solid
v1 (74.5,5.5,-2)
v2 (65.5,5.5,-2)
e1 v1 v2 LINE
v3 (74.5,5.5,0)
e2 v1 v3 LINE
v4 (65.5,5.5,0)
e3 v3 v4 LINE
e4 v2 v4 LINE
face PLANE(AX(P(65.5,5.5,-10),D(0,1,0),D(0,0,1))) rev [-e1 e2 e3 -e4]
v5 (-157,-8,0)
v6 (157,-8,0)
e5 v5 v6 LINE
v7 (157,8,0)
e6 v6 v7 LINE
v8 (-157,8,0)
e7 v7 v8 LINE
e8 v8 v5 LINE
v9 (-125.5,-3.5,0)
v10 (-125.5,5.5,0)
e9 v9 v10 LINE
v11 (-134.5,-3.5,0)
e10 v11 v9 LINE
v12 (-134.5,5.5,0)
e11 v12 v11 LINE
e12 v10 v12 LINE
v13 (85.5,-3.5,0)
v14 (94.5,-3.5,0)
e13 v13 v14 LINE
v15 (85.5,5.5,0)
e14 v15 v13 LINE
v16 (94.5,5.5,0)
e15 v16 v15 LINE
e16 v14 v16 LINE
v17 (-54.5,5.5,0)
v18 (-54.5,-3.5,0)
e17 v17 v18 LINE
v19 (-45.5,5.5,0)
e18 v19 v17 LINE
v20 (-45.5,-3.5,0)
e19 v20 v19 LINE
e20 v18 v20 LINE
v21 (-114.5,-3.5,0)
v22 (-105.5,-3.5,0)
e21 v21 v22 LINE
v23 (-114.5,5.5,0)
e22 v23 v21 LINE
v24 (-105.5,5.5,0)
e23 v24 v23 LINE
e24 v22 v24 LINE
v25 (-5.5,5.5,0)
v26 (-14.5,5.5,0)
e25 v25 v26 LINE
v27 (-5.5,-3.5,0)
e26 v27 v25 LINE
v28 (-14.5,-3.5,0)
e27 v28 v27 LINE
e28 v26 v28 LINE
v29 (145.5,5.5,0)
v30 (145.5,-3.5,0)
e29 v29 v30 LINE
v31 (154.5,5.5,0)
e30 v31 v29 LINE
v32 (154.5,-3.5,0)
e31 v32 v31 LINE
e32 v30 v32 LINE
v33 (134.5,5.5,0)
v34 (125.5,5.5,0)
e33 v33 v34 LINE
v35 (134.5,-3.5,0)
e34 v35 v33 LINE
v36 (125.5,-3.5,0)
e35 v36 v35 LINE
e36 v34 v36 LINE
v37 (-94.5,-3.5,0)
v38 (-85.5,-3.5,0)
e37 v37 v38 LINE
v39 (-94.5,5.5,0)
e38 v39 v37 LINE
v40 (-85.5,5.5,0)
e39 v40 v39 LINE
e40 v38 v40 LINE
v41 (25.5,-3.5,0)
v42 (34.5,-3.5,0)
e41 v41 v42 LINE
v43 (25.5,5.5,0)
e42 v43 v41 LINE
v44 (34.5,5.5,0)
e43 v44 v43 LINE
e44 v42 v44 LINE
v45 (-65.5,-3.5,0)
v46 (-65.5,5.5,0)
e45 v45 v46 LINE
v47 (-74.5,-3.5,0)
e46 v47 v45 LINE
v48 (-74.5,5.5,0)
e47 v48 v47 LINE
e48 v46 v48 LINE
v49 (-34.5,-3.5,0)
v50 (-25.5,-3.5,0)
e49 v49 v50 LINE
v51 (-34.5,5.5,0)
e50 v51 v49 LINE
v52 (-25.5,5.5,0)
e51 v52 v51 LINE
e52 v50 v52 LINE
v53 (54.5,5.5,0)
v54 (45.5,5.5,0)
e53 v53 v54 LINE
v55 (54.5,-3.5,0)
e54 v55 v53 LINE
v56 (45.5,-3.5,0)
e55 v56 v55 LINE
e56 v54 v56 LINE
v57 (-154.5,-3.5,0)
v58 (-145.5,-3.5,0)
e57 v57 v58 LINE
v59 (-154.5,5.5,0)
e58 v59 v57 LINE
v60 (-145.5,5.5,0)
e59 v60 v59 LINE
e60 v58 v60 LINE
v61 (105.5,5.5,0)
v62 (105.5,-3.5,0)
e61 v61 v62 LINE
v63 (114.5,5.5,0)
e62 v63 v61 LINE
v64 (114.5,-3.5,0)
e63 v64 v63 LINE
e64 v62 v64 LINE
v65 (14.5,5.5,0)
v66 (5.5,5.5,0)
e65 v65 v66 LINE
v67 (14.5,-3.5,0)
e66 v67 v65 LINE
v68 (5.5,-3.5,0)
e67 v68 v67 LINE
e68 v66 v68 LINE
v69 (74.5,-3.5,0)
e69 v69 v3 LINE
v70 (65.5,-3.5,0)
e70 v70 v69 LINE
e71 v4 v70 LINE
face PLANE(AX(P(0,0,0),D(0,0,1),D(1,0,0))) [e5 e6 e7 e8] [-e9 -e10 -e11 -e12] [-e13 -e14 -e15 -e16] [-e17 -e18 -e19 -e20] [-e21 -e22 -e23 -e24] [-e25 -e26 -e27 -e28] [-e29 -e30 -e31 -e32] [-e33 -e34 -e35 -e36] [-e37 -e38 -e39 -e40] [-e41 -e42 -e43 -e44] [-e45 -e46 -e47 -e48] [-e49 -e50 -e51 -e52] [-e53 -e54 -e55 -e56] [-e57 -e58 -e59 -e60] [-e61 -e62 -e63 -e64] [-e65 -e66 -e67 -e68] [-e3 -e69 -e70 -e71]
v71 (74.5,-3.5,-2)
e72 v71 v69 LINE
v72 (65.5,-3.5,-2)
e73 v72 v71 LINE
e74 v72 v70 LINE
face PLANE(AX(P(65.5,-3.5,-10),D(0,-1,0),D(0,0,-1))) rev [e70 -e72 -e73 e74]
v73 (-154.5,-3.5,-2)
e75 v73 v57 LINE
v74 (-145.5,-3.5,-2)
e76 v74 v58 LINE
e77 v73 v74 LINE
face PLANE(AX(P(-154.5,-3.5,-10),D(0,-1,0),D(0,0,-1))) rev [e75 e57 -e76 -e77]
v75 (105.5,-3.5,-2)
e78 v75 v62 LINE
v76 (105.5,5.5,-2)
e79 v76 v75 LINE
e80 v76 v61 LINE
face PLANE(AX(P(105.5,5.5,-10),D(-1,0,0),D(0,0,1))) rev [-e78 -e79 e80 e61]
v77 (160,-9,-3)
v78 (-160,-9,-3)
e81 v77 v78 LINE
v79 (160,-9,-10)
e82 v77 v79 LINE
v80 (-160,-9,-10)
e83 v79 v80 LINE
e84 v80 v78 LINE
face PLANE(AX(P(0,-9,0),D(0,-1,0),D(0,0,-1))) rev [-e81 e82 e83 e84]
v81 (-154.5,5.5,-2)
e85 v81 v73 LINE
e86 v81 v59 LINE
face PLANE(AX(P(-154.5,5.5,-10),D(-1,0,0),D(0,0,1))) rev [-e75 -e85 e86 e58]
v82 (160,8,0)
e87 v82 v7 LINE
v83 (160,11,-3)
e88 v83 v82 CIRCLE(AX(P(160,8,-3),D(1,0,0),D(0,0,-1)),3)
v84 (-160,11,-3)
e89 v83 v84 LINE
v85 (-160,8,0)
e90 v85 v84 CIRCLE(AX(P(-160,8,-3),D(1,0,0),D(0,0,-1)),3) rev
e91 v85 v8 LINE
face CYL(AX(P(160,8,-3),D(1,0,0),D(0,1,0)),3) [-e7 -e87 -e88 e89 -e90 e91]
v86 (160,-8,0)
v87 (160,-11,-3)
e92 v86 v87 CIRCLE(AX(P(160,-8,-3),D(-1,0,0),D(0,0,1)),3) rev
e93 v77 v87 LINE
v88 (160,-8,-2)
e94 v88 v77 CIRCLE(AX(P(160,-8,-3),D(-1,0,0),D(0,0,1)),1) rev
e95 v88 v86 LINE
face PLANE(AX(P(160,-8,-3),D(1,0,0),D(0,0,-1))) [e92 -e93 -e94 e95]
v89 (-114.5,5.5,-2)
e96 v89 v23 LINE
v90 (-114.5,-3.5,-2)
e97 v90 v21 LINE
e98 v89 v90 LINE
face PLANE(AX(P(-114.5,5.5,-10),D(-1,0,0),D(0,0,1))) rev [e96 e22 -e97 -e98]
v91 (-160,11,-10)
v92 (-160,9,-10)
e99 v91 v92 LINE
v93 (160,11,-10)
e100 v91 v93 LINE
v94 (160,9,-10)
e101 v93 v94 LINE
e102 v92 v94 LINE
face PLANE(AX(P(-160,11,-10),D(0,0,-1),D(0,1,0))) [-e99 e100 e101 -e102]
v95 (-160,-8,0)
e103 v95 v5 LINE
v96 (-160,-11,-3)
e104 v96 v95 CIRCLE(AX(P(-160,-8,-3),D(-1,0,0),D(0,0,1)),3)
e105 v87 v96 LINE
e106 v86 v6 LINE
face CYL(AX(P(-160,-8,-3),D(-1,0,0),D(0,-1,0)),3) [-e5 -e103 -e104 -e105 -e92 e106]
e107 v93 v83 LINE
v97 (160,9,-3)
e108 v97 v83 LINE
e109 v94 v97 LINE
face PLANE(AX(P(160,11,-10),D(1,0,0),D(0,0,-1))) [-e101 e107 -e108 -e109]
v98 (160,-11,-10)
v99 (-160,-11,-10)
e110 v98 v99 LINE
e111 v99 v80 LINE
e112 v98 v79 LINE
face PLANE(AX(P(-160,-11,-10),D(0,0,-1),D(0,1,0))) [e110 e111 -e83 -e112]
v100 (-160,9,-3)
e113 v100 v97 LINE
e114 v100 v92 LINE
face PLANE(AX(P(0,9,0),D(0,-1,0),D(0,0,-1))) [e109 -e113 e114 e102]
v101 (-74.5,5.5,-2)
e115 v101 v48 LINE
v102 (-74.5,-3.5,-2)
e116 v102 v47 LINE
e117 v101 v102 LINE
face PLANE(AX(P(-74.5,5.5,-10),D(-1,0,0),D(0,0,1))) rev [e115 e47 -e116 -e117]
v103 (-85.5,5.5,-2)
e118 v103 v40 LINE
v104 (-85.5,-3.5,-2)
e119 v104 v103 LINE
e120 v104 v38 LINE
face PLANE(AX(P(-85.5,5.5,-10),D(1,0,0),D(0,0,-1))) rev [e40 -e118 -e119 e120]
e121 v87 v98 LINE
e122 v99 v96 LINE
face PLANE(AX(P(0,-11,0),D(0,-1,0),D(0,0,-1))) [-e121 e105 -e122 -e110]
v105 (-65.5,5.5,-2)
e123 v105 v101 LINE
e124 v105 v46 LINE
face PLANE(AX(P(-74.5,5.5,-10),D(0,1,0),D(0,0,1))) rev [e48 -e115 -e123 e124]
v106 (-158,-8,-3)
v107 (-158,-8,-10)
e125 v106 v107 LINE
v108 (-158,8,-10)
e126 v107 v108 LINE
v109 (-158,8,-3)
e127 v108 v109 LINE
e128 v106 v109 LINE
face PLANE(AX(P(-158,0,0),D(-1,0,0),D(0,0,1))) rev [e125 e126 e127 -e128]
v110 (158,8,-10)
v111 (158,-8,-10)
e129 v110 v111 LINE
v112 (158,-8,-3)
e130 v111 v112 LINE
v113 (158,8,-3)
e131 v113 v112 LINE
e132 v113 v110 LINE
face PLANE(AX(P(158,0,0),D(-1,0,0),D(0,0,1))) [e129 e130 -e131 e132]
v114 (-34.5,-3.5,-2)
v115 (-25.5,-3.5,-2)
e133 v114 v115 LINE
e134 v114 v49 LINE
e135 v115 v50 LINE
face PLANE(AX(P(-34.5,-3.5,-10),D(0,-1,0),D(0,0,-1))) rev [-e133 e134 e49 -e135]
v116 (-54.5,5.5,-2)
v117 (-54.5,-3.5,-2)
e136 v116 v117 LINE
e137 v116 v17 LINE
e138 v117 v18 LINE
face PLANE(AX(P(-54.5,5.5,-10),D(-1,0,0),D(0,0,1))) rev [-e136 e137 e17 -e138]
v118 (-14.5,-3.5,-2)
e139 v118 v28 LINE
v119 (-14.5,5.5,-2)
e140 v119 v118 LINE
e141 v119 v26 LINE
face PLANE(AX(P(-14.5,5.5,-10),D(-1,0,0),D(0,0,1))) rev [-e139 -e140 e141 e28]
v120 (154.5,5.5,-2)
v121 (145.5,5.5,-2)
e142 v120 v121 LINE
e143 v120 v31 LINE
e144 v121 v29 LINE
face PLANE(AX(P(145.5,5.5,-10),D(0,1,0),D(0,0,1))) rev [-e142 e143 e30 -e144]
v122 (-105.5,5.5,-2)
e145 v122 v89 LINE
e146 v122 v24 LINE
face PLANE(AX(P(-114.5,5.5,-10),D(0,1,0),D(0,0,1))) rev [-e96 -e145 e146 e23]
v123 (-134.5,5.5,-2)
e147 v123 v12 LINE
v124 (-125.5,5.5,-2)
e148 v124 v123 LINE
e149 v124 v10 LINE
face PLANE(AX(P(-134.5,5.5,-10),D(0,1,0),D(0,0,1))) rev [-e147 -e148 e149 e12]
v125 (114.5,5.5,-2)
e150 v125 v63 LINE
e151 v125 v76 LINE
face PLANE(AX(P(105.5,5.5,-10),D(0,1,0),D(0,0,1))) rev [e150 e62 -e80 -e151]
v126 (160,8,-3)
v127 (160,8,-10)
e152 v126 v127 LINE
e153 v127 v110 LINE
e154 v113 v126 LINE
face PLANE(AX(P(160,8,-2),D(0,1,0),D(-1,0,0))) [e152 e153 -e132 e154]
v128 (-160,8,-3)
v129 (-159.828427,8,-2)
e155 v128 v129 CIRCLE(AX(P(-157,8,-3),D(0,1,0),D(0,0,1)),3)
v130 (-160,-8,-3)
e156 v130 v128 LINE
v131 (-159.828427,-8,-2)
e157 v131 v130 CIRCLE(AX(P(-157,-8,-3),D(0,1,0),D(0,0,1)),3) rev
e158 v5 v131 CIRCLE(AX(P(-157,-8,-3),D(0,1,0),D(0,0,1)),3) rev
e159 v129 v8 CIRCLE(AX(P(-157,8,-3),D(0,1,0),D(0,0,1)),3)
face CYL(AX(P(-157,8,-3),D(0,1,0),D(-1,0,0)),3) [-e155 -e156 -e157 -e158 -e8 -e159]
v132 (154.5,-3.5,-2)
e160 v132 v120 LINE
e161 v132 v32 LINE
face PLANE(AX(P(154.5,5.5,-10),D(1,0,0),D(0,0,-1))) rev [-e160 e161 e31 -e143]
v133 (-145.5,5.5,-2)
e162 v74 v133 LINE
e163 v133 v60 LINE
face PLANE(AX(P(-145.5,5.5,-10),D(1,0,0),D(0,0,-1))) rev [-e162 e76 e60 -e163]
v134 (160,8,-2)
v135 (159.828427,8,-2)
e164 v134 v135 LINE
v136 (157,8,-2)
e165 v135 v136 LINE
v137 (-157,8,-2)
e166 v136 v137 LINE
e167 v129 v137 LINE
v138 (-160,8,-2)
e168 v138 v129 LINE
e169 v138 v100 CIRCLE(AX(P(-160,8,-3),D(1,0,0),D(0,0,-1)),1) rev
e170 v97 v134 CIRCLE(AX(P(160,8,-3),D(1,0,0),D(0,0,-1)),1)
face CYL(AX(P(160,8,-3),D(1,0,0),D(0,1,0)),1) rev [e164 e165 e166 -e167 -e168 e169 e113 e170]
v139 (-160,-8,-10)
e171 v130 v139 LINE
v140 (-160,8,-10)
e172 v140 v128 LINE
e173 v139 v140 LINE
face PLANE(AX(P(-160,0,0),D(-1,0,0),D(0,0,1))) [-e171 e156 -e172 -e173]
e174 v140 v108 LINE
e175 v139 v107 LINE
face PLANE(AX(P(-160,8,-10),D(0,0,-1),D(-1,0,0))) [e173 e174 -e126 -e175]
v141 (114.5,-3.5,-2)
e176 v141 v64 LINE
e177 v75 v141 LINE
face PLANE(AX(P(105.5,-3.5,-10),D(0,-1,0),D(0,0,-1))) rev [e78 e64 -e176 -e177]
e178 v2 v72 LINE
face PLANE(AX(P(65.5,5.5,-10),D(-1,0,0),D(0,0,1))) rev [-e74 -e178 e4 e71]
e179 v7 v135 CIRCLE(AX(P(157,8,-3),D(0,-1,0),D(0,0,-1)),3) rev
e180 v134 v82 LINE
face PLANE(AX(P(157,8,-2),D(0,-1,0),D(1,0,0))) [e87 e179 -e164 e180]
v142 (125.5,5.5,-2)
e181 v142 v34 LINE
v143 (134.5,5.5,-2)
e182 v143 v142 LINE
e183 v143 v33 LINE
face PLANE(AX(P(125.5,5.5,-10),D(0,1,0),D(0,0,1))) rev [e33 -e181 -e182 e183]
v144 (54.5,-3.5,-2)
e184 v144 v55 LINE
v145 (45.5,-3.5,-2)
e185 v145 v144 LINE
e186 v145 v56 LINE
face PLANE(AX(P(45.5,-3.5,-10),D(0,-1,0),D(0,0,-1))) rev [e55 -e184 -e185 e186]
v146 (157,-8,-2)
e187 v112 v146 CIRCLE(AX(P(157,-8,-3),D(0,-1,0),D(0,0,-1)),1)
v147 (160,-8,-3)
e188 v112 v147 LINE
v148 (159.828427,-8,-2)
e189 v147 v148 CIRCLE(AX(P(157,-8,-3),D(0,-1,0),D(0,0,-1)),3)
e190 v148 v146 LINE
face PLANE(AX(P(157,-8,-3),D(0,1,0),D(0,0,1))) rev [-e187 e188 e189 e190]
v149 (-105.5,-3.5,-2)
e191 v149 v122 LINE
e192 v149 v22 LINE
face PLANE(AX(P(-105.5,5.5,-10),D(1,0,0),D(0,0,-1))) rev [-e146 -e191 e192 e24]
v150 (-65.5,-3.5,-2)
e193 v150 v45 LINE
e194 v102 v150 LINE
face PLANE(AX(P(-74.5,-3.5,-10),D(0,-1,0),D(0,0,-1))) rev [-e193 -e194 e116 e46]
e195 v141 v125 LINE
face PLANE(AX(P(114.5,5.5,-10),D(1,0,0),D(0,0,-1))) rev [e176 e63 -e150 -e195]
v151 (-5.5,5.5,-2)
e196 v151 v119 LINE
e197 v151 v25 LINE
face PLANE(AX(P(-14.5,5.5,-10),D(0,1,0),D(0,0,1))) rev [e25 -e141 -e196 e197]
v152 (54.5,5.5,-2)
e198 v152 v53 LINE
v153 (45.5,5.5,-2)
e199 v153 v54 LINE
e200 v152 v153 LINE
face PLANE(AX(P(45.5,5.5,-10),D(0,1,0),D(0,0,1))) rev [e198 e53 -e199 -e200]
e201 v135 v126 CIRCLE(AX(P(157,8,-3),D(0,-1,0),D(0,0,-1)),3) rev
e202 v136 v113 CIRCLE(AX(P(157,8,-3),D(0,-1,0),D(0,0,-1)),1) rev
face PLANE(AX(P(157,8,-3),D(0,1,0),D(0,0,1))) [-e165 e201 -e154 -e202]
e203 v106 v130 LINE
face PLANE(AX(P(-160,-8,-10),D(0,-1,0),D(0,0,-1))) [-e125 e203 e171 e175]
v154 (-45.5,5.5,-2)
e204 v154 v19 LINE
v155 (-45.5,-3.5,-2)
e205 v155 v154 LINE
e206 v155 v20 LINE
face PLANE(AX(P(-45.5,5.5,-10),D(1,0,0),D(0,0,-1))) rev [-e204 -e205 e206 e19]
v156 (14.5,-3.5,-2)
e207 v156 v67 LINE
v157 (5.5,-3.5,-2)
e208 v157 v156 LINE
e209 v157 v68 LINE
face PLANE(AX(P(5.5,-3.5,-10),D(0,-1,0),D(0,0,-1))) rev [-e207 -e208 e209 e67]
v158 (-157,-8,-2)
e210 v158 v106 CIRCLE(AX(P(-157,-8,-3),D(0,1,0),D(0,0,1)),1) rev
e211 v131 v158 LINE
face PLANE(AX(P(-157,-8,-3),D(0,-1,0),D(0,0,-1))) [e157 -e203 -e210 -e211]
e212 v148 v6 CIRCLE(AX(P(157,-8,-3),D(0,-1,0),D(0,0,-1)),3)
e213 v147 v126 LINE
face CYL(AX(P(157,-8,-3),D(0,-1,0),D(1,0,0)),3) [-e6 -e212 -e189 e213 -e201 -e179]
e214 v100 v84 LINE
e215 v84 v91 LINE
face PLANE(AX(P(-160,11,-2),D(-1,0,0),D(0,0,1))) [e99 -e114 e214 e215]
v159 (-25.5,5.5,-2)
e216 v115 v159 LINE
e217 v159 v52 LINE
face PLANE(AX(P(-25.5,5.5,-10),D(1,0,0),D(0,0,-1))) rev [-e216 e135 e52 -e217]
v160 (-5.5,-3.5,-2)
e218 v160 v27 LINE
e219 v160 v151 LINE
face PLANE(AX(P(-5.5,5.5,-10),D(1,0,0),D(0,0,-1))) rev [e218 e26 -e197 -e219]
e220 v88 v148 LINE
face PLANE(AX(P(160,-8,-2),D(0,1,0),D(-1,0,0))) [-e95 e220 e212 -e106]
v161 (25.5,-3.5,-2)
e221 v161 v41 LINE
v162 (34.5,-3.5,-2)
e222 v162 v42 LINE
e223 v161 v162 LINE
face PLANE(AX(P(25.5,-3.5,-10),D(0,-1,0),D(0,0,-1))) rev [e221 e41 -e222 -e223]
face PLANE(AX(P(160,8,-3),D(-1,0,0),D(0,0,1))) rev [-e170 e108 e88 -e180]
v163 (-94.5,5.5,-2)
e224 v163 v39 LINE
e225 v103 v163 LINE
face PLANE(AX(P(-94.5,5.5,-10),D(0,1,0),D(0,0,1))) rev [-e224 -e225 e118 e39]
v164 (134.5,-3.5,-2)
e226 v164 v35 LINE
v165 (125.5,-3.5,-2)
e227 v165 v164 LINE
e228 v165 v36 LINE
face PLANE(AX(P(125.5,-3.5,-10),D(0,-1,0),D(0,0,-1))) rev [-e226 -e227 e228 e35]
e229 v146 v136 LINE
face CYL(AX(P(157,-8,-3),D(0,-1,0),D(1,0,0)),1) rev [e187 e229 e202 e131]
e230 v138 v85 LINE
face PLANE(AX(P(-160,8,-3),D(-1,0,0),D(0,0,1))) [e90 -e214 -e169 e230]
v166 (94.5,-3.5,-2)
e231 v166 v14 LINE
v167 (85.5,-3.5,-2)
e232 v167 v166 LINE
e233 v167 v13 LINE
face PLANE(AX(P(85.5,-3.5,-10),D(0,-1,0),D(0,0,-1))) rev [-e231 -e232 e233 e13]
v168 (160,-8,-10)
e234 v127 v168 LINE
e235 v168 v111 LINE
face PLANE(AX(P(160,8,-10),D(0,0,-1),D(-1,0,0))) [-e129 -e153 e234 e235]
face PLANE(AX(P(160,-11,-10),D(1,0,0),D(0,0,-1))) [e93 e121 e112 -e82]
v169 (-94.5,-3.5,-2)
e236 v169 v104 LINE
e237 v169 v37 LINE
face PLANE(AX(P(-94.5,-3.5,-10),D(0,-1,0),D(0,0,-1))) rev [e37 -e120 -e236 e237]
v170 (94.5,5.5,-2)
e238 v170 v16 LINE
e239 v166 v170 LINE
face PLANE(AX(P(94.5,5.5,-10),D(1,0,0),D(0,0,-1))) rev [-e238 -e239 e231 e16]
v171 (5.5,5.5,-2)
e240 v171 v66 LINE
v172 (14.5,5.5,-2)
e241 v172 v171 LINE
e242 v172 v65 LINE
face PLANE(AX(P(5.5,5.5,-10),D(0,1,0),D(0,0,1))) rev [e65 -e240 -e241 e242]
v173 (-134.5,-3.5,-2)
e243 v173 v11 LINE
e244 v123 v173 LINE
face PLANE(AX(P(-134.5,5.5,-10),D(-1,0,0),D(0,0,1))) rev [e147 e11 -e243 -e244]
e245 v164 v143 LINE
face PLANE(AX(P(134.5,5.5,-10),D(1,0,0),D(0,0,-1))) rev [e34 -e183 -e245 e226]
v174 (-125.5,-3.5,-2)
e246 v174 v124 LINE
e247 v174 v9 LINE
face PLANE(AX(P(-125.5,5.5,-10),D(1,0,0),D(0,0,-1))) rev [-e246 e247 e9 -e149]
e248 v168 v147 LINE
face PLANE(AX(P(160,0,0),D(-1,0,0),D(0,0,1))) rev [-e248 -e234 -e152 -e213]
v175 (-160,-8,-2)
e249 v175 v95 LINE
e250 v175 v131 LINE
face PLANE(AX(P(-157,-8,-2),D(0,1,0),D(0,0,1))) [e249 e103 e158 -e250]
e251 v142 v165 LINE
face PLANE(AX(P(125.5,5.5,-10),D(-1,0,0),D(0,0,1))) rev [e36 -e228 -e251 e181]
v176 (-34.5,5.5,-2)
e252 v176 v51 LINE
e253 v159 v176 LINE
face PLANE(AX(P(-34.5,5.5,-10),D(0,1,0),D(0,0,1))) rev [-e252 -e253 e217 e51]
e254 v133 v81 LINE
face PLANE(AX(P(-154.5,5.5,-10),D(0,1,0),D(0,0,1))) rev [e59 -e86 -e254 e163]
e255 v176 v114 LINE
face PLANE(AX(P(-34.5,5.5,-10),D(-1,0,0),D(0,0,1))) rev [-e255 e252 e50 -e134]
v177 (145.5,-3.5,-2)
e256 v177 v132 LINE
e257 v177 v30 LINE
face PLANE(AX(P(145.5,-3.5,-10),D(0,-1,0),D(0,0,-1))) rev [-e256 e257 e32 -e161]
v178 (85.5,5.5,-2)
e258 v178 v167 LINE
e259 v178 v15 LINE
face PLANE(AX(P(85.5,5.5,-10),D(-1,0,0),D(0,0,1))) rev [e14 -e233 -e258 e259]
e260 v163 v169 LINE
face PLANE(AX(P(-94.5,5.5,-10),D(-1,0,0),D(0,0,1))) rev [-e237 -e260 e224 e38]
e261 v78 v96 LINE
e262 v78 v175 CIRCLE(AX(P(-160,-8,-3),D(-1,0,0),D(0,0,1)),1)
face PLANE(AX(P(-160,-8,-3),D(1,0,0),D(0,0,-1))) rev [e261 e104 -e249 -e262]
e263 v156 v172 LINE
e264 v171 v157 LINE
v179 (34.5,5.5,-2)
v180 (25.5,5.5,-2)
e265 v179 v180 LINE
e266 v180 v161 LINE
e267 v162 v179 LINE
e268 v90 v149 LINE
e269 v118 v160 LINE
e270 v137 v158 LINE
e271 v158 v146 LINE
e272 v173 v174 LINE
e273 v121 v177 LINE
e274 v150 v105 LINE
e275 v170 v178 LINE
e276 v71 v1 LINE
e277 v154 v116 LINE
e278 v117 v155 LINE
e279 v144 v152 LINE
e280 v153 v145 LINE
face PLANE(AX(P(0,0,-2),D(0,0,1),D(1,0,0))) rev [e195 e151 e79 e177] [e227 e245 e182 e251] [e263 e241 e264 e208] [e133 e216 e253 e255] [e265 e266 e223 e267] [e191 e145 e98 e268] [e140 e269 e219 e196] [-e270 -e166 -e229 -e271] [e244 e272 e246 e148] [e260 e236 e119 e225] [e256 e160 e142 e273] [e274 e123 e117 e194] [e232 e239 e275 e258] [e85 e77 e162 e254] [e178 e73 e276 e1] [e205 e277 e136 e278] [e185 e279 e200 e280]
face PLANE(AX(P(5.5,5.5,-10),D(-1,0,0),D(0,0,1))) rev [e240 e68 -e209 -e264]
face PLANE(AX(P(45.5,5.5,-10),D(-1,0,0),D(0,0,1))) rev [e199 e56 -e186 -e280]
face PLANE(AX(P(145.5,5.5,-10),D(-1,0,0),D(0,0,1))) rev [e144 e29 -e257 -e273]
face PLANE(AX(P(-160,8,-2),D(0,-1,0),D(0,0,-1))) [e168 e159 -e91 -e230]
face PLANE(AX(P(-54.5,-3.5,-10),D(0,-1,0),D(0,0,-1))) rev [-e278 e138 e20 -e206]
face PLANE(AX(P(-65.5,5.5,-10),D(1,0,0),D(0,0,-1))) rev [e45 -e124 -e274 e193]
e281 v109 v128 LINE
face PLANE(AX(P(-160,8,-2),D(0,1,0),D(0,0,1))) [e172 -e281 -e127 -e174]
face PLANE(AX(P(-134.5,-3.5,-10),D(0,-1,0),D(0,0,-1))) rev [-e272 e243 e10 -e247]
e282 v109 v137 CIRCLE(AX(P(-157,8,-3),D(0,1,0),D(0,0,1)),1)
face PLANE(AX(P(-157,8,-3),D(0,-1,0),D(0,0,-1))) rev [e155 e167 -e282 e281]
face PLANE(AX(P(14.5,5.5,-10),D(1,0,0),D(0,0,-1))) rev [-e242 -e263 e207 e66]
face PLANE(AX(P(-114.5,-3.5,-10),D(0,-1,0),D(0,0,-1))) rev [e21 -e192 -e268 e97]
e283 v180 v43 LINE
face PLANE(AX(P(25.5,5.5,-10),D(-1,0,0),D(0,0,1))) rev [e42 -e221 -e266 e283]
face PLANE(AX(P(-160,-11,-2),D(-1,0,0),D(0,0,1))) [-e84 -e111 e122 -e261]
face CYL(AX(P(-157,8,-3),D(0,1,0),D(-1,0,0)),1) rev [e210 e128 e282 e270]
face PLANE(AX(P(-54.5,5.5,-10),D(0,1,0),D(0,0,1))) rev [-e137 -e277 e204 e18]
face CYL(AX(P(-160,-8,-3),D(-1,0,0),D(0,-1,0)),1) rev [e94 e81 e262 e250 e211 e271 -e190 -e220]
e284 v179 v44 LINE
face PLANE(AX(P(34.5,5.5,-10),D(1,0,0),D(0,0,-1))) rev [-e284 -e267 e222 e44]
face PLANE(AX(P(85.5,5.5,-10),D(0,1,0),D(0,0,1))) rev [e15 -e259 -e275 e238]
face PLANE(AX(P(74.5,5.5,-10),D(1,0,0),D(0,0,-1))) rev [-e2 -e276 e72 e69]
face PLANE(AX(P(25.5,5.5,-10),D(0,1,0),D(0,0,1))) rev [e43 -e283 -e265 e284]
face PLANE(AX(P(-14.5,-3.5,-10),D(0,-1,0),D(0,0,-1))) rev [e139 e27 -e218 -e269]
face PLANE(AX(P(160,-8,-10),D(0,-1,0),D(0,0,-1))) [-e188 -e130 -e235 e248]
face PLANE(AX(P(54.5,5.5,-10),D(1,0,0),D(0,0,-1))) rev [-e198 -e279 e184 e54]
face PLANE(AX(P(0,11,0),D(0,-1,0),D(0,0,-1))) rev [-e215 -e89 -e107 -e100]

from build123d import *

# Parameters (mm, degrees)
SKETCH_1_W                         = 320
SKETCH_1_H                         = 22
SM_BASE_FLANGE_1_DEPTH             = 2
SM_EDGE_FLANGE_1_STRIP_W           = 10
SM_EDGE_FLANGE_1_STRIP_H           = 2
SM_EDGE_FLANGE_1_STRIP_CUT_DEPTH   = 320
SM_EDGE_FLANGE_1_STRIP_2_W         = 10
SM_EDGE_FLANGE_1_STRIP_2_H         = 2
SM_EDGE_FLANGE_1_STRIP_CUT_2_DEPTH = 320
SM_EDGE_FLANGE_1_DEPTH             = 320
SM_EDGE_FLANGE_1_BEND_DEPTH        = 320
SM_EDGE_FLANGE_2_STRIP_W           = 10
SM_EDGE_FLANGE_2_STRIP_H           = 2
SM_EDGE_FLANGE_2_STRIP_CUT_DEPTH   = 16
SM_EDGE_FLANGE_2_STRIP_2_W         = 10
SM_EDGE_FLANGE_2_STRIP_2_H         = 2
SM_EDGE_FLANGE_2_STRIP_CUT_2_DEPTH = 16
SM_EDGE_FLANGE_2_DEPTH             = 16
SM_EDGE_FLANGE_2_BEND_DEPTH        = 16
SKETCH_18_W                        = 9
SKETCH_18_H                        = 9
CUT_EXTRUDE_1_DEPTH                = 10
PATTERN_LINEAR_1_COUNT             = 20
PATTERN_LINEAR_1_PITCH             = 20


# Sheet-metal steps are written as plain solids
with BuildPart() as part:
    # Sketch 1 → 基体-法兰1 (new body)
    with BuildSketch(Plane.XY):
        Rectangle(SKETCH_1_W, SKETCH_1_H)
    extrude(amount=-SM_BASE_FLANGE_1_DEPTH)

    # 边线-法兰1 strip (across the edge) → 边线-法兰1 strip cut (cut)
    with BuildSketch(Plane(origin=(160, -11, -2), x_dir=(0, 1, 0), z_dir=(-1, 0, 0))):
        with Locations((-2, -1)):
            Rectangle(SM_EDGE_FLANGE_1_STRIP_W, SM_EDGE_FLANGE_1_STRIP_H)
    extrude(amount=SM_EDGE_FLANGE_1_STRIP_CUT_DEPTH, mode=Mode.SUBTRACT)

    # 边线-法兰1 strip 2 (across the edge) → 边线-法兰1 strip cut 2 (cut)
    with BuildSketch(Plane(origin=(-160, 11, -2), x_dir=(0, -1, 0), z_dir=(1, 0, 0))):
        with Locations((-2, -1)):
            Rectangle(SM_EDGE_FLANGE_1_STRIP_2_W, SM_EDGE_FLANGE_1_STRIP_2_H)
    extrude(amount=SM_EDGE_FLANGE_1_STRIP_CUT_2_DEPTH, mode=Mode.SUBTRACT)

    # 边线-法兰1 section (across the edge) → 边线-法兰1 (add)
    with BuildSketch(Plane(origin=(160, -11, -2), x_dir=(0, 1, 0), z_dir=(-1, 0, 0))):
        with BuildLine():
            Line((0, 1), (0, 8))
            Line((0, 8), (2, 8))
            Line((2, 8), (2, 1))
            ThreePointArc((2, 1), (2.292893219, 0.292893219), (3, 0))
            Line((3, 0), (3, -2))
            ThreePointArc((3, -2), (0.878679656, -1.121320344), (0, 1))
        make_face()
    extrude(amount=SM_EDGE_FLANGE_1_DEPTH)

    # 边线-法兰1 section 2 (across the edge) → 边线-法兰1 bend (add)
    with BuildSketch(Plane(origin=(-160, 11, -2), x_dir=(0, -1, 0), z_dir=(1, 0, 0))):
        with BuildLine():
            Line((0, 1), (0, 8))
            Line((0, 8), (2, 8))
            Line((2, 8), (2, 1))
            ThreePointArc((2, 1), (2.292893219, 0.292893219), (3, 0))
            Line((3, 0), (3, -2))
            ThreePointArc((3, -2), (0.878679656, -1.121320344), (0, 1))
        make_face()
    extrude(amount=SM_EDGE_FLANGE_1_BEND_DEPTH)

    # 边线-法兰2 strip (across the edge) → 边线-法兰2 strip cut (cut)
    with BuildSketch(Plane(origin=(-160, -8, -2), x_dir=(1, 0, 0), z_dir=(0, 1, 0))):
        with Locations((-2, -1)):
            Rectangle(SM_EDGE_FLANGE_2_STRIP_W, SM_EDGE_FLANGE_2_STRIP_H)
    extrude(amount=SM_EDGE_FLANGE_2_STRIP_CUT_DEPTH, mode=Mode.SUBTRACT)

    # 边线-法兰2 strip 2 (across the edge) → 边线-法兰2 strip cut 2 (cut)
    with BuildSketch(Plane(origin=(160, 8, -2), x_dir=(-1, 0, 0), z_dir=(0, -1, 0))):
        with Locations((-2, -1)):
            Rectangle(SM_EDGE_FLANGE_2_STRIP_2_W, SM_EDGE_FLANGE_2_STRIP_2_H)
    extrude(amount=SM_EDGE_FLANGE_2_STRIP_CUT_2_DEPTH, mode=Mode.SUBTRACT)

    # 边线-法兰2 section (across the edge) → 边线-法兰2 (add)
    with BuildSketch(Plane(origin=(-160, -8, -2), x_dir=(1, 0, 0), z_dir=(0, 1, 0))):
        with BuildLine():
            Line((0, 1), (0, 8))
            Line((0, 8), (2, 8))
            Line((2, 8), (2, 1))
            ThreePointArc((2, 1), (2.292893219, 0.292893219), (3, 0))
            Line((3, 0), (3, -2))
            ThreePointArc((3, -2), (0.878679656, -1.121320344), (0, 1))
        make_face()
    extrude(amount=SM_EDGE_FLANGE_2_DEPTH)

    # 边线-法兰2 section 2 (across the edge) → 边线-法兰2 bend (add)
    with BuildSketch(Plane(origin=(160, 8, -2), x_dir=(-1, 0, 0), z_dir=(0, -1, 0))):
        with BuildLine():
            Line((0, 1), (0, 8))
            Line((0, 8), (2, 8))
            Line((2, 8), (2, 1))
            ThreePointArc((2, 1), (2.292893219, 0.292893219), (3, 0))
            Line((3, 0), (3, -2))
            ThreePointArc((3, -2), (0.878679656, -1.121320344), (0, 1))
        make_face()
    extrude(amount=SM_EDGE_FLANGE_2_BEND_DEPTH)

    # 草图18 → 切除-拉伸1 (cut)
    with BuildSketch(Plane.XY):
        with Locations((-150, 1)):
            Rectangle(SKETCH_18_W, SKETCH_18_H)
    cut_extrude_1 = extrude(amount=-CUT_EXTRUDE_1_DEPTH, mode=Mode.SUBTRACT)

    # 阵列(线性)1: 切除-拉伸1 ×20
    with Locations(*[(i * PATTERN_LINEAR_1_PITCH, 0, 0) for i in range(1, PATTERN_LINEAR_1_COUNT)]):
        add(cut_extrude_1, mode=Mode.SUBTRACT)


solid = part.part
